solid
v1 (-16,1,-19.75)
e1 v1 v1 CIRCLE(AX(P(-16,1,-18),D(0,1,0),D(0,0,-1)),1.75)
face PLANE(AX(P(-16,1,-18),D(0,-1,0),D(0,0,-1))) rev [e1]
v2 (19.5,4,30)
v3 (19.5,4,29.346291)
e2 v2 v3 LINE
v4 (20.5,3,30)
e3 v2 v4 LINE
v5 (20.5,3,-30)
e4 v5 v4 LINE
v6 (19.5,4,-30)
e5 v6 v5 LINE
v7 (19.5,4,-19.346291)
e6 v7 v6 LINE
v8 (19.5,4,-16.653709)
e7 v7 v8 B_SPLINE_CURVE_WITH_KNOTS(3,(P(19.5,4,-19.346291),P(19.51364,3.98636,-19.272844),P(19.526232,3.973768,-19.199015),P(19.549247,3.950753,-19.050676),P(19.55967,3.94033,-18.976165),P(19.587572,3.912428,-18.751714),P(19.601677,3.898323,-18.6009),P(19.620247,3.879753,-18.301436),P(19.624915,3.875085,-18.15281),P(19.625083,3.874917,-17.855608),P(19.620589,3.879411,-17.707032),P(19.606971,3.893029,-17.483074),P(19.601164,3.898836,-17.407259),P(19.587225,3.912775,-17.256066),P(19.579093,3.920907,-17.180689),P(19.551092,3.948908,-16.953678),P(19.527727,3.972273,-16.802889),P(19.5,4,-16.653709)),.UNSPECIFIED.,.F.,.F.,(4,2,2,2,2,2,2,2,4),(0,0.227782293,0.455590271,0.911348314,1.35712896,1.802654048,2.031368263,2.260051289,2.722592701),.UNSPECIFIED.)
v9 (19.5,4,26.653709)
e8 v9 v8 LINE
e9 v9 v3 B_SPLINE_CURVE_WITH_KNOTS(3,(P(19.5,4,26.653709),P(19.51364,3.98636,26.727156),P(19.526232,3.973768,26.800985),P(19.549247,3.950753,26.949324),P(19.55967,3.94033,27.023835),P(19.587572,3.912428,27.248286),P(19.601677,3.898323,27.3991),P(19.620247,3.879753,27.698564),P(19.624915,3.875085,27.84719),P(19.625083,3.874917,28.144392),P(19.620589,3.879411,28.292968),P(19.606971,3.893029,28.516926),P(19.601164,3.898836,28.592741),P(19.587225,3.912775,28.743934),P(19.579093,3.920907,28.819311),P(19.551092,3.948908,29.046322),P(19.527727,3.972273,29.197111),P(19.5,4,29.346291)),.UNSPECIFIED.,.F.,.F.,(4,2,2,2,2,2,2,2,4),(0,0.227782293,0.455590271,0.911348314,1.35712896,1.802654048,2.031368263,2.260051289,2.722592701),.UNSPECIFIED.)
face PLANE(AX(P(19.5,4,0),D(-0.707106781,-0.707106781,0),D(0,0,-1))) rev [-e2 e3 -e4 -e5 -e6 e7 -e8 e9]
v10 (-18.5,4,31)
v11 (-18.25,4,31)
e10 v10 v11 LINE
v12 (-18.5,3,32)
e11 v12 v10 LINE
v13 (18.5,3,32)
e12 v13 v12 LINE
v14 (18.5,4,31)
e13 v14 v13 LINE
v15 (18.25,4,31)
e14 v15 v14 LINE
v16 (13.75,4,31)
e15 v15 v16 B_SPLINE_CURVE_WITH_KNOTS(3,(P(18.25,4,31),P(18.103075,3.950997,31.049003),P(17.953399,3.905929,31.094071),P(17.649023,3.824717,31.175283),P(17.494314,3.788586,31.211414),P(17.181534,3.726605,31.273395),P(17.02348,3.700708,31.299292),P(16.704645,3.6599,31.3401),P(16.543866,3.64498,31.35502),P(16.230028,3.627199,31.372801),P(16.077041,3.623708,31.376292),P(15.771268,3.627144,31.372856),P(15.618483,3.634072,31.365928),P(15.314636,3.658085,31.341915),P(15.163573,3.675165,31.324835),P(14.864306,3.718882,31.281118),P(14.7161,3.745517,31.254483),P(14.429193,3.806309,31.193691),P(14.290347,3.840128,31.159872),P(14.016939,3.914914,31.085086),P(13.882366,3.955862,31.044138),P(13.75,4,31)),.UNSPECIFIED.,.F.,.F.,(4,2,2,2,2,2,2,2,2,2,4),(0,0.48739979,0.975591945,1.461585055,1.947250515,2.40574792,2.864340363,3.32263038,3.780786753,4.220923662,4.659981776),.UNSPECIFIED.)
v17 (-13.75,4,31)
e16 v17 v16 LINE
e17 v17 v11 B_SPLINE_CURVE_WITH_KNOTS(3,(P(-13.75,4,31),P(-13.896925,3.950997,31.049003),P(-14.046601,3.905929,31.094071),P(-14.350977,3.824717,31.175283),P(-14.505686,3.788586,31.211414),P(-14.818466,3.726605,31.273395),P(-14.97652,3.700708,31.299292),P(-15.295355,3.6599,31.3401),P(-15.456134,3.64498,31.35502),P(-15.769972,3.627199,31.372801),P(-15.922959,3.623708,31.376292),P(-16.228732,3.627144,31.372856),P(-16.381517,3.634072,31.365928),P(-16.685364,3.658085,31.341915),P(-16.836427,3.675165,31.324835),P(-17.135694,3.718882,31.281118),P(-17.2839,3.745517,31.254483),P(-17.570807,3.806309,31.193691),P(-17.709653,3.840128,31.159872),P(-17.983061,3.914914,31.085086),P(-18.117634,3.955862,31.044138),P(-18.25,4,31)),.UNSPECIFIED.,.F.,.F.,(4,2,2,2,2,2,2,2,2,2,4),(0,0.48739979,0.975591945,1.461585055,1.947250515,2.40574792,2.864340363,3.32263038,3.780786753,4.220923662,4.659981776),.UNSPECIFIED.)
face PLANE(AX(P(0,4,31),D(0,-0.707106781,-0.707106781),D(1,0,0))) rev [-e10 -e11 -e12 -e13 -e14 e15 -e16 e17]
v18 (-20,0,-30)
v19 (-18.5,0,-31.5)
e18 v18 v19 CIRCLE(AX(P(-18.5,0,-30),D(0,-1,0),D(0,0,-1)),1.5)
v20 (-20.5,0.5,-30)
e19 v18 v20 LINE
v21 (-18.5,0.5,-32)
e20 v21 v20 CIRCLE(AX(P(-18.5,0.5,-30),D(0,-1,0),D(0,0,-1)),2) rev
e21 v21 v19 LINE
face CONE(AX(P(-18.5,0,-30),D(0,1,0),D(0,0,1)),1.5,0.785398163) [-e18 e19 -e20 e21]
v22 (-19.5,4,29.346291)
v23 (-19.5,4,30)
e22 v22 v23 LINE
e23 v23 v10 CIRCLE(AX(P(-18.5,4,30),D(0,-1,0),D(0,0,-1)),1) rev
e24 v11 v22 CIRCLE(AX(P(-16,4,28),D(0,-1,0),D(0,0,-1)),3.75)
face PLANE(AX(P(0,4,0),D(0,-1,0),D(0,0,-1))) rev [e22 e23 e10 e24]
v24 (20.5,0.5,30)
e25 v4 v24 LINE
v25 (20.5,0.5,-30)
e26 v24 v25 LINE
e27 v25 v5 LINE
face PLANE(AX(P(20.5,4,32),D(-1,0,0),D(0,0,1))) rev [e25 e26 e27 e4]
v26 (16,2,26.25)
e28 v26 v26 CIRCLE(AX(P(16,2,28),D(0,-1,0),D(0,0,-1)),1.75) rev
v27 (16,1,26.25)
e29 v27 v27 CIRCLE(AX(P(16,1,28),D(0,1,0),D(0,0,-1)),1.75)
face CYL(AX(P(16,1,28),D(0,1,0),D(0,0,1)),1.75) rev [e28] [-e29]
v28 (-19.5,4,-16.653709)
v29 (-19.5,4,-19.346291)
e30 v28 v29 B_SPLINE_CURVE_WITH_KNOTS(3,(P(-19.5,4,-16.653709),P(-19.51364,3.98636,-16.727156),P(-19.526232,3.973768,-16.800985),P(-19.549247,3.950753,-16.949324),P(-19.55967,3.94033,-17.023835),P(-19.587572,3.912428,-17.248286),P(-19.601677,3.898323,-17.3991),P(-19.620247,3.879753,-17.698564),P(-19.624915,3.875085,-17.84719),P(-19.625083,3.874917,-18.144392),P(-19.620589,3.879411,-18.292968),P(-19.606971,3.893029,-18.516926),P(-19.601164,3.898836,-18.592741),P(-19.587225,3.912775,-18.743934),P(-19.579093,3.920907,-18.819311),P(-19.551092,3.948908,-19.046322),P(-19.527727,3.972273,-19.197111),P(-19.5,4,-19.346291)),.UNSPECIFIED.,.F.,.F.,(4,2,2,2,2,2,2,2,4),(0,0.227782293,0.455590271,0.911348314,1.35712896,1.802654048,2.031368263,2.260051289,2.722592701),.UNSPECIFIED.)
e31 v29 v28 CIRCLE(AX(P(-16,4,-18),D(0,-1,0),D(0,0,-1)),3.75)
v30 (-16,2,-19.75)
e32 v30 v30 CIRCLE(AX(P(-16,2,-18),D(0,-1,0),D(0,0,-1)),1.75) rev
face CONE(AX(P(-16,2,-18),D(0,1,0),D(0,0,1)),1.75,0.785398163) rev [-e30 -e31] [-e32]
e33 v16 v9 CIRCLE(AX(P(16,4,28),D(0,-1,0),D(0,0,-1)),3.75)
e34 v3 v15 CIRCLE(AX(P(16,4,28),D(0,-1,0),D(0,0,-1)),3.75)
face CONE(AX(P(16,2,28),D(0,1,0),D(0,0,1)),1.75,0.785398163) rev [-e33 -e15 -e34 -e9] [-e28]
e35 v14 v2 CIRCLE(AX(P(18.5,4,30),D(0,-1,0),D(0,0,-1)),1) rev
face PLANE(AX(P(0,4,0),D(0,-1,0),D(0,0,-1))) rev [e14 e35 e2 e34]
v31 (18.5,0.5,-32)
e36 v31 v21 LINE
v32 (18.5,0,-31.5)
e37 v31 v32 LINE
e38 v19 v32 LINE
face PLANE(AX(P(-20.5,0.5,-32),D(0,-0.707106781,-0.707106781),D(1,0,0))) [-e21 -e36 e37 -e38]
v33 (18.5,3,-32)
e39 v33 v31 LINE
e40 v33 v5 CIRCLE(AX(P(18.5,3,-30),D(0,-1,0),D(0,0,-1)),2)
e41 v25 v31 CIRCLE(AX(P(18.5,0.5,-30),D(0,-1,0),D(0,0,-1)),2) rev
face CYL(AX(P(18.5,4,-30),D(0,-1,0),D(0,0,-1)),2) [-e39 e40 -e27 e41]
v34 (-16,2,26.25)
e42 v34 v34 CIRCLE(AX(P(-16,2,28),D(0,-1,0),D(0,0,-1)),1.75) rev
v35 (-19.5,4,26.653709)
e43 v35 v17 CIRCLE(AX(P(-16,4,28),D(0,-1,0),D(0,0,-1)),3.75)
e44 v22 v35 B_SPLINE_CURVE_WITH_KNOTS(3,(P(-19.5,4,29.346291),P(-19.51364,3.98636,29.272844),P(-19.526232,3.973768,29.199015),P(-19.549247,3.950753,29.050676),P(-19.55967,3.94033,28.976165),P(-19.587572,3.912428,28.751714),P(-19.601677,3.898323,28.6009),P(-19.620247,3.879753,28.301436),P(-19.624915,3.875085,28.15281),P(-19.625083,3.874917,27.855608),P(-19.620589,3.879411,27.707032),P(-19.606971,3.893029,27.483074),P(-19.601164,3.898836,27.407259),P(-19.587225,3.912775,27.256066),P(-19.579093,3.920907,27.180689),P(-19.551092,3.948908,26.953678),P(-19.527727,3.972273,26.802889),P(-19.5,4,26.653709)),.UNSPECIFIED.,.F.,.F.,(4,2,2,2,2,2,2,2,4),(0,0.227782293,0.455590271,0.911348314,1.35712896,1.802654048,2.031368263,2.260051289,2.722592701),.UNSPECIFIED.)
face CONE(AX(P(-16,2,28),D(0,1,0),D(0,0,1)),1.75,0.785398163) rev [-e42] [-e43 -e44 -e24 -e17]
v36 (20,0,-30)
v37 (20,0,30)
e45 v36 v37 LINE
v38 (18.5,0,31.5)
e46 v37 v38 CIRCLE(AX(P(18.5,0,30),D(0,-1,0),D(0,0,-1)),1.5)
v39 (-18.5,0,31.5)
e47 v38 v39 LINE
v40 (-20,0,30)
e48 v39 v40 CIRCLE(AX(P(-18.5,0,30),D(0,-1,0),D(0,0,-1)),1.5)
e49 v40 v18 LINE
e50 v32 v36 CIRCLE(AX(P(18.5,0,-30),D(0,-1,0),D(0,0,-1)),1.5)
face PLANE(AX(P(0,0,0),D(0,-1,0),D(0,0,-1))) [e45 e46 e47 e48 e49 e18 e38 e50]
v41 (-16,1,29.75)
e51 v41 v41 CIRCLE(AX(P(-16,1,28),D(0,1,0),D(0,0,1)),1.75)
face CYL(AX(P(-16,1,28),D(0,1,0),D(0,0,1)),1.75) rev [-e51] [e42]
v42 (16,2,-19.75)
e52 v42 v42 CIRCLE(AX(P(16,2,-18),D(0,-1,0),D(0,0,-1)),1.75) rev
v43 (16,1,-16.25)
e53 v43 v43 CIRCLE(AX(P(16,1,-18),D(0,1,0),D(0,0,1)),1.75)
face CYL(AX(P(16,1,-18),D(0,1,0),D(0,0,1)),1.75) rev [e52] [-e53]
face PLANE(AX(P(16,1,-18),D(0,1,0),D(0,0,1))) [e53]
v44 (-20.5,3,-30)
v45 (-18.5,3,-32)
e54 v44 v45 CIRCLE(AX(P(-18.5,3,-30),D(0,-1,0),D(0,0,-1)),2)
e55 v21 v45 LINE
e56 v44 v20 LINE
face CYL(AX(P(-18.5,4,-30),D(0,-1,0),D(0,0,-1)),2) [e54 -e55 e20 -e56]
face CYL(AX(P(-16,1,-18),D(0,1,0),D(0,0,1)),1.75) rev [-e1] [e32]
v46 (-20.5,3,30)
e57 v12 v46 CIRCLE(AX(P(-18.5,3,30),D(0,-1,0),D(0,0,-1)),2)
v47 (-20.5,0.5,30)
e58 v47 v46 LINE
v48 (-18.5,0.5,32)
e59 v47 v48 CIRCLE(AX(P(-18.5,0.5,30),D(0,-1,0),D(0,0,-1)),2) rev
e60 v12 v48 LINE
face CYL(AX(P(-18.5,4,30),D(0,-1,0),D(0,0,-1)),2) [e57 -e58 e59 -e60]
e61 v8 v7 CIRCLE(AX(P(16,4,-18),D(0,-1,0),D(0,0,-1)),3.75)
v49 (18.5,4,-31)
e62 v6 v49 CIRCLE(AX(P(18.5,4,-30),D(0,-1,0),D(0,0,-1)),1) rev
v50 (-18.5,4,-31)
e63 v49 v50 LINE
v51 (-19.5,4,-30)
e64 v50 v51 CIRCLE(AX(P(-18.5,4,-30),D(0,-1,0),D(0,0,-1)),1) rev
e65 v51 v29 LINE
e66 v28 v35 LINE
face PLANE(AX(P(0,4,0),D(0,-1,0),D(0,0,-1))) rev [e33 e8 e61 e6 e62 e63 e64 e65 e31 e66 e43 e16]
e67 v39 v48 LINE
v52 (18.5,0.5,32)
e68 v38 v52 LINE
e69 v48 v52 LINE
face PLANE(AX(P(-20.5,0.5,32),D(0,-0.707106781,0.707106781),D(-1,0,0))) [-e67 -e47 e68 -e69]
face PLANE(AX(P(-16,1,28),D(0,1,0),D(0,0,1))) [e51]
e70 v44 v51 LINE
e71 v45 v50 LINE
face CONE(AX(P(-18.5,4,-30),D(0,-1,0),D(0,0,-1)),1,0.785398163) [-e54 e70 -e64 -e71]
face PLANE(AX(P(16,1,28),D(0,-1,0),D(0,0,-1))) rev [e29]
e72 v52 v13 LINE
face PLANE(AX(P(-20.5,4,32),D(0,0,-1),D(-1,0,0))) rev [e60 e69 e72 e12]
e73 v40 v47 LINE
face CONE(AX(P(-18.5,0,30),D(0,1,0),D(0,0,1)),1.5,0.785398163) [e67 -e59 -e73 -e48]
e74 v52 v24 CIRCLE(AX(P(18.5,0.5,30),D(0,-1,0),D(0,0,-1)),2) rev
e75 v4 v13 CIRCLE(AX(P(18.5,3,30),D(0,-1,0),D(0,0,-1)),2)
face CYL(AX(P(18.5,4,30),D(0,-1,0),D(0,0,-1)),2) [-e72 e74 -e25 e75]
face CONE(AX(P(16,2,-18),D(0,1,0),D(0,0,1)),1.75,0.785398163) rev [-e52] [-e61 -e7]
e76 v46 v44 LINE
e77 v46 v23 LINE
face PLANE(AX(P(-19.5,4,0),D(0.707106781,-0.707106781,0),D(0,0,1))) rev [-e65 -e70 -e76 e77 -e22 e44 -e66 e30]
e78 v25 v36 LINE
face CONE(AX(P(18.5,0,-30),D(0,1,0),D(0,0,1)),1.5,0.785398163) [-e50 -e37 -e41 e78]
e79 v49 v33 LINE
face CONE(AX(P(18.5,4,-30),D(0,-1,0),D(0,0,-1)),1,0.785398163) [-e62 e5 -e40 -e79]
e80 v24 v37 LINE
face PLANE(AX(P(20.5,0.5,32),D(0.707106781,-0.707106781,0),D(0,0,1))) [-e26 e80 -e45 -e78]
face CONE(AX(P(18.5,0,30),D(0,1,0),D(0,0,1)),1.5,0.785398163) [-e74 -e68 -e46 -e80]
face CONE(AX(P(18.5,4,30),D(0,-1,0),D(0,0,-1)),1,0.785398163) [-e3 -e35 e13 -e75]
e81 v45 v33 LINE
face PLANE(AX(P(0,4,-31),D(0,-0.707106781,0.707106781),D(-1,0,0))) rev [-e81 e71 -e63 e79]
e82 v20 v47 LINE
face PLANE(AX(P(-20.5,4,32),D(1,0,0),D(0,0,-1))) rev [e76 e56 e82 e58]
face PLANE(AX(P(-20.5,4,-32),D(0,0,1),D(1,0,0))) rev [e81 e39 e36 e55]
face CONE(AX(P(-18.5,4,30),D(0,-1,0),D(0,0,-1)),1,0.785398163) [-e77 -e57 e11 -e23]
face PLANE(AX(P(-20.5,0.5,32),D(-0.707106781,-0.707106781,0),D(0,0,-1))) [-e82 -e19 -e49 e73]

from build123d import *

# Parameters (mm, degrees)
SKETCH_1_W          = 41
SKETCH_1_H          = 64
EXTRUDE_1_DEPTH     = 4
SKETCH_2_R          = 1.75
CUT_EXTRUDE_1_DEPTH = 3
FILLET_1_R          = 2
CHAMFER_2_SIZE      = 1
CHAMFER_1_SIZE      = 2
CHAMFER_3_SIZE      = 0.5


with BuildPart() as part:
    # Эскиз1 → Бобышка-Вытянуть1 (new body)
    with BuildSketch(Plane(origin=(0, 0, 0), x_dir=(1, 0, 0), z_dir=(0, 1, 0))):
        Rectangle(SKETCH_1_W, SKETCH_1_H)
    extrude(amount=EXTRUDE_1_DEPTH)

    # Эскиз2 → Вырез-Вытянуть1 (cut)
    with BuildSketch(Plane(origin=(0, 4, 0), x_dir=(1, 0, 0), z_dir=(0, 1, 0))):
        with Locations(Location((16, 18, 0), (0, 0, 270))):
            Circle(SKETCH_2_R)
        with Locations(Location((16, -28, 0), (0, 0, 90))):
            Circle(SKETCH_2_R)
        with Locations(Location((-16, 18, 0), (0, 0, 90))):
            Circle(SKETCH_2_R)
        with Locations(Location((-16, -28, 0), (0, 0, 270))):
            Circle(SKETCH_2_R)
    extrude(amount=-CUT_EXTRUDE_1_DEPTH, mode=Mode.SUBTRACT)

    # Скругление1
    fillet_1_edges = [part.edges().sort_by_distance(p)[0] for p in [
        (20.5, 2, 32),
        (-20.5, 2, 32),
        (-20.5, 2, -32),
        (20.5, 2, -32),
    ]]
    fillet(fillet_1_edges, radius=FILLET_1_R)

    # Фаска2
    chamfer_2_edges = [part.edges().sort_by_distance(p)[0] for p in [
        (0, 4, -32),
        (20.5, 4, 0),
        (-20.5, 4, 0),
        (0, 4, 32),
        (19.914213562, 4, 31.414213562),
        (-19.914213562, 4, 31.414213562),
        (-19.914213562, 4, -31.414213562),
        (19.914213562, 4, -31.414213562),
    ]]
    chamfer(chamfer_2_edges, length=CHAMFER_2_SIZE)

    # Фаска1
    # the kernel refuses this chamfer: 2 mm, written as the material it takes off along each edge
    with BuildSketch(Plane(origin=(-16, 4, -18), x_dir=(0, 0, -1), z_dir=(1, 0, 0))) as chamfer_1_piece_1:
        Polygon((1.75 + CHAMFER_1_SIZE, 0), (1.75, -CHAMFER_1_SIZE), (1.75, 0), align=None)
    revolve(axis=Axis((-16, 4, -18), (0, 1, 0)), mode=Mode.SUBTRACT)
    with BuildSketch(Plane(origin=(-16, 4, 28), x_dir=(0, 0, 1), z_dir=(-1, 0, 0))) as chamfer_1_piece_2:
        Polygon((1.75 + CHAMFER_1_SIZE, 0), (1.75, -CHAMFER_1_SIZE), (1.75, 0), align=None)
    revolve(axis=Axis((-16, 4, 28), (0, 1, 0)), mode=Mode.SUBTRACT)
    with BuildSketch(Plane(origin=(16, 4, 28), x_dir=(0, 0, -1), z_dir=(1, 0, 0))) as chamfer_1_piece_3:
        Polygon((1.75 + CHAMFER_1_SIZE, 0), (1.75, -CHAMFER_1_SIZE), (1.75, 0), align=None)
    revolve(axis=Axis((16, 4, 28), (0, 1, 0)), mode=Mode.SUBTRACT)
    with BuildSketch(Plane(origin=(16, 4, -18), x_dir=(0, 0, 1), z_dir=(-1, 0, 0))) as chamfer_1_piece_4:
        Polygon((1.75 + CHAMFER_1_SIZE, 0), (1.75, -CHAMFER_1_SIZE), (1.75, 0), align=None)
    revolve(axis=Axis((16, 4, -18), (0, 1, 0)), mode=Mode.SUBTRACT)

    # Фаска3
    chamfer_3_edges = [part.edges().sort_by_distance(p)[0] for p in [
        (0, 0, -32),
        (20.5, 0, 0),
        (0, 0, 32),
        (-20.5, 0, 0),
        (19.914213562, 0, 31.414213562),
        (-19.914213562, 0, 31.414213562),
        (-19.914213562, 0, -31.414213562),
        (19.914213562, 0, -31.414213562),
    ]]
    chamfer(chamfer_3_edges, length=CHAMFER_3_SIZE)


solid = part.part
